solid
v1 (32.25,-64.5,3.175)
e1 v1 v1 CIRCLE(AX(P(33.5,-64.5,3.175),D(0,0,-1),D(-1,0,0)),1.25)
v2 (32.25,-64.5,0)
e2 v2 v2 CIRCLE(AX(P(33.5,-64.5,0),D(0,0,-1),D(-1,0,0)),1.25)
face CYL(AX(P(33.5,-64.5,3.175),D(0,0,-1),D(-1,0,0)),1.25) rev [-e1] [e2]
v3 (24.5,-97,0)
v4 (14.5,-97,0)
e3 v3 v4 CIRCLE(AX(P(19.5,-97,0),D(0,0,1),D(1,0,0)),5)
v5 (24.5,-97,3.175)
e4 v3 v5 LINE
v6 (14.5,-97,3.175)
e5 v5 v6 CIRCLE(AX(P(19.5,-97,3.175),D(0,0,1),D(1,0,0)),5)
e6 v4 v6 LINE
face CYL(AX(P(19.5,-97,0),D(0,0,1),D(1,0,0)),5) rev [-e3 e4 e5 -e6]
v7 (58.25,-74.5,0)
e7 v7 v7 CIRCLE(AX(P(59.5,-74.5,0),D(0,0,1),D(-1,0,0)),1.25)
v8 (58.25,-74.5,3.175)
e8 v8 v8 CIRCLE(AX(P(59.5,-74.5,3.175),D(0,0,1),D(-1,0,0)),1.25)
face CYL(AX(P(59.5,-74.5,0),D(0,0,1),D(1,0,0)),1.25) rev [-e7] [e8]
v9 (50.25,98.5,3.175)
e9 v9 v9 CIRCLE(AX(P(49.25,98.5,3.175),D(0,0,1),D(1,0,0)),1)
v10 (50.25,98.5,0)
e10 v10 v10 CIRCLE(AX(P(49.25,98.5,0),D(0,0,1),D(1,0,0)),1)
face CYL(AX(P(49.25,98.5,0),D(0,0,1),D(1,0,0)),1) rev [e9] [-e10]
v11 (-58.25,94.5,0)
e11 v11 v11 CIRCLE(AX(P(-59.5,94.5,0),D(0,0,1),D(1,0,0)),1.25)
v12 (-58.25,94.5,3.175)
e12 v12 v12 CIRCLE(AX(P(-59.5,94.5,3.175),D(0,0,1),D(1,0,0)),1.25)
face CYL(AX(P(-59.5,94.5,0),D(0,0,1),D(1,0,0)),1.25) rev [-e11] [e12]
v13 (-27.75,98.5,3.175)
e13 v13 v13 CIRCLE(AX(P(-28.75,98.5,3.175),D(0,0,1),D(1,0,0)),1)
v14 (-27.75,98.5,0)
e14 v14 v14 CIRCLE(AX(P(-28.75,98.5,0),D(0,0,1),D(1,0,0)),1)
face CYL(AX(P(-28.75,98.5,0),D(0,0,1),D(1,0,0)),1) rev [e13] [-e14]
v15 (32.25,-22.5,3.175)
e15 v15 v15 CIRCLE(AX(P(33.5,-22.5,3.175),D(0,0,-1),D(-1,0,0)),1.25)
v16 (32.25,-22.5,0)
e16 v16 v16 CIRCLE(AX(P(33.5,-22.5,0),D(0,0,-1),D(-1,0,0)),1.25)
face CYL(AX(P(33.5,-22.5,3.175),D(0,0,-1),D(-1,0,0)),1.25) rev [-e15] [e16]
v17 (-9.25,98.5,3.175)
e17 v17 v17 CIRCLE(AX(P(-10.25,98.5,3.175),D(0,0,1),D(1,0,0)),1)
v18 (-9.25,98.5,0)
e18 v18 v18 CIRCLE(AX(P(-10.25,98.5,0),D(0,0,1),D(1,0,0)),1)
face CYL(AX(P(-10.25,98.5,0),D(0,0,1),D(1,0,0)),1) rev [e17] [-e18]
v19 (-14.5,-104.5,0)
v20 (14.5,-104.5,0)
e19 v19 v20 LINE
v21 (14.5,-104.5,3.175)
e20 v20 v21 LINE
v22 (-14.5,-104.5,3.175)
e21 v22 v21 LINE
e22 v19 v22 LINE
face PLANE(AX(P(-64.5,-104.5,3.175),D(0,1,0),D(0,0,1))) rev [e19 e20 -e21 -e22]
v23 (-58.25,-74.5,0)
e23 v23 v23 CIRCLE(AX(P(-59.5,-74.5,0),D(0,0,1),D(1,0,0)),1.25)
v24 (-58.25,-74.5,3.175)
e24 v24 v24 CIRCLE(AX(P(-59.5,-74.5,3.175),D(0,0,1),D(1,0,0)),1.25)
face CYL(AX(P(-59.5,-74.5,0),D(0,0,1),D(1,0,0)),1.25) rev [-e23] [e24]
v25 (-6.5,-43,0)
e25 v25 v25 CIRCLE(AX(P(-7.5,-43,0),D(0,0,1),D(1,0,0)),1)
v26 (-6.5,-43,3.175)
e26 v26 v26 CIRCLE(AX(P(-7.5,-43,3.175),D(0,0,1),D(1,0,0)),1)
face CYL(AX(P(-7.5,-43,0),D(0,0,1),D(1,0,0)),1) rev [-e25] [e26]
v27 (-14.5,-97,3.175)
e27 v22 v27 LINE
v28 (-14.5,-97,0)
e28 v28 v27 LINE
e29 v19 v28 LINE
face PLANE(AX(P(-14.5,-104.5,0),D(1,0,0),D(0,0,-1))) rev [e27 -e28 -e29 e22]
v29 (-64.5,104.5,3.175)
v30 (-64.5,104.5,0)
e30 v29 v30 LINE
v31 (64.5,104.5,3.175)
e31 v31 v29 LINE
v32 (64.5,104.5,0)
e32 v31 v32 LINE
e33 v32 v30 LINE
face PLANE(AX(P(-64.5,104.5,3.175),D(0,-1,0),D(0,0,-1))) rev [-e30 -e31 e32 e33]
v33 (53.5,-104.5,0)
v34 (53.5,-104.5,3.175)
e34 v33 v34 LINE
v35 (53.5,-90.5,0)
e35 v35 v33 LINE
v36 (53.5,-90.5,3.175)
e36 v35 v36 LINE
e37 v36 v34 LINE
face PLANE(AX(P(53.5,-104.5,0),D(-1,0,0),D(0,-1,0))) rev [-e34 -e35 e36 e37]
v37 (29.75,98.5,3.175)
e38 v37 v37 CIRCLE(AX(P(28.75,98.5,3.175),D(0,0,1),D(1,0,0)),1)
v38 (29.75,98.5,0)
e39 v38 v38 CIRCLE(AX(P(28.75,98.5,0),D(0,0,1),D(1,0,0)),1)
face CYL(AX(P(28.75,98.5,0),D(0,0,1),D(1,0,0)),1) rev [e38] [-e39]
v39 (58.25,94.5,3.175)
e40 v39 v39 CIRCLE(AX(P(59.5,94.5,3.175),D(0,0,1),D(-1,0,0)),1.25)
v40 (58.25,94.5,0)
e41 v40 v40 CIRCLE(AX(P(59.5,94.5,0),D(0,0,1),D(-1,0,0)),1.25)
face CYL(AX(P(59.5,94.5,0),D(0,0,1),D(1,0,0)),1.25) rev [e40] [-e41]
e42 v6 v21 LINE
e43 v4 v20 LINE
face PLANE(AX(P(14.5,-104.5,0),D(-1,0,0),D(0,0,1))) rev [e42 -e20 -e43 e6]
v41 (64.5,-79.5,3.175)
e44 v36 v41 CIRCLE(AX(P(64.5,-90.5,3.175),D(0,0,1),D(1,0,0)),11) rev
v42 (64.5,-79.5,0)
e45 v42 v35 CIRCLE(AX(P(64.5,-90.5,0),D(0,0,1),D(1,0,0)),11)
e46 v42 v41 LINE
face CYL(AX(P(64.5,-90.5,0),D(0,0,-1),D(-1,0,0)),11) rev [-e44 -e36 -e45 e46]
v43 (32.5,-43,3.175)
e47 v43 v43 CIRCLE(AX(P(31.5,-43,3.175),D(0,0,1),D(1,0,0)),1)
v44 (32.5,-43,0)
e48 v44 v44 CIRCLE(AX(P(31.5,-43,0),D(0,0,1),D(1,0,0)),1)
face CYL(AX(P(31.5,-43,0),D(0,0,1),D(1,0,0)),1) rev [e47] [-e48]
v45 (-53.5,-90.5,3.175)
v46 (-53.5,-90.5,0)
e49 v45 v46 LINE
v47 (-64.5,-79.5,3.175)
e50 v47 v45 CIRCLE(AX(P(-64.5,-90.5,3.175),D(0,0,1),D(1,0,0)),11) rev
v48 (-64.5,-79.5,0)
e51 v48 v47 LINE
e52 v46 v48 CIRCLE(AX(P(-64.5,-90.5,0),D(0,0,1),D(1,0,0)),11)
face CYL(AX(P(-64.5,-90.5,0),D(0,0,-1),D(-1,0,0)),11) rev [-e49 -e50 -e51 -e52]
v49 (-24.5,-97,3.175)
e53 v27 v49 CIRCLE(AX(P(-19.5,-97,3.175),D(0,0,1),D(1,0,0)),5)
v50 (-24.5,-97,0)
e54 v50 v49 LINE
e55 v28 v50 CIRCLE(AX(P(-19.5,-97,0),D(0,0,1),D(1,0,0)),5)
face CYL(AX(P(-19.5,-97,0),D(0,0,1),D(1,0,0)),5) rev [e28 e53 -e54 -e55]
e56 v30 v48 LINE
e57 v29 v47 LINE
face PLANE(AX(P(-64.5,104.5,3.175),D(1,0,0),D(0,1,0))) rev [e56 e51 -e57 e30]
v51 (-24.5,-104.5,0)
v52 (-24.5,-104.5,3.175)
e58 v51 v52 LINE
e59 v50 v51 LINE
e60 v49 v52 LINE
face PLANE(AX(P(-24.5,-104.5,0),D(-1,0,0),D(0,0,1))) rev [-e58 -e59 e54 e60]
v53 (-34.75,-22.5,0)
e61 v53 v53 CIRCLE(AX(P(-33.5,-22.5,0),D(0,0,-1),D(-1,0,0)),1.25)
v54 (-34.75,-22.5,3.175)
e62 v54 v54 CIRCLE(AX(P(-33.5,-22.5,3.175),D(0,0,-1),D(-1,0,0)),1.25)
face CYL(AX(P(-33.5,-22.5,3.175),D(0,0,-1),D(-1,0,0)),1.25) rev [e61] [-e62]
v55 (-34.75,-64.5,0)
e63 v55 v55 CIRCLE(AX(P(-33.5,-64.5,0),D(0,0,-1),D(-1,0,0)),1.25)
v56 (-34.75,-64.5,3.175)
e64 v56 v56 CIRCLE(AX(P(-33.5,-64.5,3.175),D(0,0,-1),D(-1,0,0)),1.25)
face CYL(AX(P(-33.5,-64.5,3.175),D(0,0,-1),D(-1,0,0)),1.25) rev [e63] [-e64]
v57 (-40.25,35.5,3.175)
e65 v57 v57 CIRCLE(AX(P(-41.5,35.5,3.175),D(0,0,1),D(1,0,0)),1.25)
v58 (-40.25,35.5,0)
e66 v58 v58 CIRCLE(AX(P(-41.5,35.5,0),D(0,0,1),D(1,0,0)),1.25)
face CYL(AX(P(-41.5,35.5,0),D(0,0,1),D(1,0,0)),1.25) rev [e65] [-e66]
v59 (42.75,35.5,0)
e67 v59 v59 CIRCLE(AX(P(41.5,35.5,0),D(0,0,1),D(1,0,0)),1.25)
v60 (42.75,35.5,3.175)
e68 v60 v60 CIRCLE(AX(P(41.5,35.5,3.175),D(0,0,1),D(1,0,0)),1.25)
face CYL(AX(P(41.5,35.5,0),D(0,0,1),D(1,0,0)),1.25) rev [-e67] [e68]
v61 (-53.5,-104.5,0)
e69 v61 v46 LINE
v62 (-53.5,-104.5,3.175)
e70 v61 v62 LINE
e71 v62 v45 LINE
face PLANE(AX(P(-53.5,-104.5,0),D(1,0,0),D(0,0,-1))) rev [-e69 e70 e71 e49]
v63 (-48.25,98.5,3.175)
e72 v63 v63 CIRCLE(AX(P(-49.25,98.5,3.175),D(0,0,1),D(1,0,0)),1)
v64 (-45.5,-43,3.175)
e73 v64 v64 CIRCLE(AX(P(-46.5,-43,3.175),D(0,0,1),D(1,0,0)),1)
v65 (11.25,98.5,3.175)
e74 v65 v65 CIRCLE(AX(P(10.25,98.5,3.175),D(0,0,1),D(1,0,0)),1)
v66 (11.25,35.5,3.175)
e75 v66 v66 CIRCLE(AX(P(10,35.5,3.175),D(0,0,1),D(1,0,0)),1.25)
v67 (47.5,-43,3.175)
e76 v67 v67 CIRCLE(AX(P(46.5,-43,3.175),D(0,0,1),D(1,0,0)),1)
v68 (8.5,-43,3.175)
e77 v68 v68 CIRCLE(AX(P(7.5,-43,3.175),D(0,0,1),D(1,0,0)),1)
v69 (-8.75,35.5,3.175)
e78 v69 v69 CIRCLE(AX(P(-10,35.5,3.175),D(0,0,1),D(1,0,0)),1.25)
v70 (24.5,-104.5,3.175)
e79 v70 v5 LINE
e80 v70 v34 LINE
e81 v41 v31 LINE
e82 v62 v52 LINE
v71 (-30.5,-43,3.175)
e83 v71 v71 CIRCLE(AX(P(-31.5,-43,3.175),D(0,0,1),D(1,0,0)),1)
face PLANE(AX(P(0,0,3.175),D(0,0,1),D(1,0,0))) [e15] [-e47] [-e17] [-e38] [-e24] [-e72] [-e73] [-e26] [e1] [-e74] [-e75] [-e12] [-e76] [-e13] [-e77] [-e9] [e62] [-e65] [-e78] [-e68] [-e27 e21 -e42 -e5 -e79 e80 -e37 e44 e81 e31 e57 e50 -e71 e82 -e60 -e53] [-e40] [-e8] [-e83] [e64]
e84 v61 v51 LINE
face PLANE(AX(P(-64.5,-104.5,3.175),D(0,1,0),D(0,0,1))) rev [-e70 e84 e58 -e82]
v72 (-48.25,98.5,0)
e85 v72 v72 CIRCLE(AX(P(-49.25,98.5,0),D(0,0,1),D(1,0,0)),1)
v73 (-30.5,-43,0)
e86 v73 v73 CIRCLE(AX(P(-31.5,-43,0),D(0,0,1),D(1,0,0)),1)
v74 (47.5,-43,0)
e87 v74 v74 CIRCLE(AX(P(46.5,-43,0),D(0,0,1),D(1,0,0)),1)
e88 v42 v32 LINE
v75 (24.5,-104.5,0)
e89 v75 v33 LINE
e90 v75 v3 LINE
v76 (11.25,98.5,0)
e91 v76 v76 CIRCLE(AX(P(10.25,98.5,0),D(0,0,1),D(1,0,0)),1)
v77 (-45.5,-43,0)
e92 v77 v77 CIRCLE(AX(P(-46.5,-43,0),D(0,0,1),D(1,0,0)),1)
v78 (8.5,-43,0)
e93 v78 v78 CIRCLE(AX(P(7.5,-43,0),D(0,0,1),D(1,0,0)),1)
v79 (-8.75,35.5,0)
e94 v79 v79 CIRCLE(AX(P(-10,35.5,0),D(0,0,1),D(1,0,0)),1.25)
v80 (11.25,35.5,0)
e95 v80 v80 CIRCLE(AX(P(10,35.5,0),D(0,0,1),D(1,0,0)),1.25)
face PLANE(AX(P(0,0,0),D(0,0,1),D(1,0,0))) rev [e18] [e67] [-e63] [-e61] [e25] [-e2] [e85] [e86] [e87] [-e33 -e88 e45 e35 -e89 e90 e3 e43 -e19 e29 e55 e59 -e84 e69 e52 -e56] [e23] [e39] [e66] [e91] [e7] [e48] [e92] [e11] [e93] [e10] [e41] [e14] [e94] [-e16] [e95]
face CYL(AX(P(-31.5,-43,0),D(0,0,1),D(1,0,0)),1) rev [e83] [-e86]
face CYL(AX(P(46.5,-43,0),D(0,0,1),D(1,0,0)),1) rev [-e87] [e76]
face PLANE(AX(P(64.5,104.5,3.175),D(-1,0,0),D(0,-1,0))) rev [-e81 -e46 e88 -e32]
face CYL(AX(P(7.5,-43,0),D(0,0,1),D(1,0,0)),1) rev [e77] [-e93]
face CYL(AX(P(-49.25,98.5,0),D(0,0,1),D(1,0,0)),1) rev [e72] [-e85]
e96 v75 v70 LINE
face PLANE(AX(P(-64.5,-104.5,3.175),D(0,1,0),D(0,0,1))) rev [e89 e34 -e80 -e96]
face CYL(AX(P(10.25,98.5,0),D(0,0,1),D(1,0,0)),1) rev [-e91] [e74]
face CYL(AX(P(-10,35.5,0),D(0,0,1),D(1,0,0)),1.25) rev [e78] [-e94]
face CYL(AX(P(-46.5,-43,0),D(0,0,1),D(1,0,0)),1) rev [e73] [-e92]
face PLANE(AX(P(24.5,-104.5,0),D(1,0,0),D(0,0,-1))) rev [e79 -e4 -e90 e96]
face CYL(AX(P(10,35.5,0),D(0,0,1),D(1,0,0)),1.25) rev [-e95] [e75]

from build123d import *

# Parameters (mm, degrees)
SKETCH1_W           = 129
SKETCH1_H           = 209
BOSS_EXTRUDE1_DEPTH = 3.175
SKETCH2_R           = 1.25
SKETCH2_W           = 11
SKETCH2_H           = 25
CUT_EXTRUDE1_DEPTH  = 123.843724402
FILLET1_R           = 11
SKETCH3_R           = 1
CUT_EXTRUDE2_DEPTH  = 123.843724402
LPATTERN1_COUNT     = 2
LPATTERN1_PITCH     = 39
LPATTERN1_COL_COUNT = 2
LPATTERN1_COL_PITCH = 39
CUT_EXTRUDE3_DEPTH  = 123.843724402
SKETCH5_R           = 1.25
CUT_EXTRUDE4_DEPTH  = 123.843724402
SKETCH6_R           = 1.25
CUT_EXTRUDE5_DEPTH  = 123.843724402


with BuildPart() as part:
    # Sketch1 → Boss-Extrude1 (new body)
    with BuildSketch(Plane.XY):
        Rectangle(SKETCH1_W, SKETCH1_H)
    extrude(amount=BOSS_EXTRUDE1_DEPTH)

    # Sketch2 → Cut-Extrude1 (cut, through all)
    with BuildSketch(Plane.XY.offset(3.175)):
        with Locations((-59.5, 94.5)):
            Circle(SKETCH2_R)
        with Locations((-59.5, -74.5)):
            Circle(SKETCH2_R)
        with Locations(Location((59.5, -74.5, 0), (0, 0, 180))):
            Circle(SKETCH2_R)
        with Locations(Location((59.5, 94.5, 0), (0, 0, 180))):
            Circle(SKETCH2_R)
        with Locations((-59, -92)):
            Rectangle(SKETCH2_W, SKETCH2_H)
        with Locations((59, -92)):
            Rectangle(SKETCH2_W, SKETCH2_H)
    extrude(amount=-CUT_EXTRUDE1_DEPTH, mode=Mode.SUBTRACT)

    # Fillet1
    fillet1_edges = [part.edges().sort_by_distance(p)[0] for p in [
        (53.5, -79.5, 1.5875),
        (-53.5, -79.5, 1.5875),
    ]]
    fillet(fillet1_edges, radius=FILLET1_R - 0.0001)  # a hair under: the kernel refuses the full size

    # Sketch3 → Cut-Extrude2 (cut, through all)
    with BuildSketch(Plane.XY.offset(3.175)):
        with Locations((-10.25, 98.5)):
            Circle(SKETCH3_R)
        with Locations((10.25, 98.5)):
            Circle(SKETCH3_R)
        with Locations((-7.5, -43)):
            Circle(SKETCH3_R)
        with Locations((7.5, -43)):
            Circle(SKETCH3_R)
    cut_extrude2 = extrude(amount=-CUT_EXTRUDE2_DEPTH, mode=Mode.SUBTRACT)

    # LPattern1: Cut-Extrude2 ×2
    with Locations(*[(i * LPATTERN1_PITCH, 0, 0) for i in range(1, LPATTERN1_COUNT)]):
        add(cut_extrude2, mode=Mode.SUBTRACT)

    # LPattern1 col: Cut-Extrude2 ×2
    with Locations(*[(-i * LPATTERN1_COL_PITCH, 0, 0) for i in range(1, LPATTERN1_COL_COUNT)]):
        add(cut_extrude2, mode=Mode.SUBTRACT)

    # Sketch4 → Cut-Extrude3 (cut, through all)
    with BuildSketch(Plane.XY.offset(3.175)):
        with BuildLine():
            Line((-24.5, -104.5), (-24.5, -97))
            ThreePointArc((-24.5, -97), (-19.5, -92), (-14.5, -97))
            Line((-14.5, -97), (-14.5, -104.5))
            ThreePointArc((-14.5, -104.5), (-19.5, -109.5), (-24.5, -104.5))
        make_face()
        with BuildLine():
            Line((14.5, -104.5), (14.5, -97))
            ThreePointArc((14.5, -97), (19.5, -92), (24.5, -97))
            Line((24.5, -97), (24.5, -104.5))
            ThreePointArc((24.5, -104.5), (19.5, -109.5), (14.5, -104.5))
        make_face()
    extrude(amount=-CUT_EXTRUDE3_DEPTH, mode=Mode.SUBTRACT)

    # Sketch5 → Cut-Extrude4 (cut, through all)
    with BuildSketch(Plane.XY.offset(3.175)):
        with Locations((-10, 35.5)):
            Circle(SKETCH5_R)
        with Locations((-41.5, 35.5)):
            Circle(SKETCH5_R)
        with Locations((10, 35.5)):
            Circle(SKETCH5_R)
        with Locations((41.5, 35.5)):
            Circle(SKETCH5_R)
    extrude(amount=-CUT_EXTRUDE4_DEPTH, mode=Mode.SUBTRACT)

    # Sketch6 → Cut-Extrude5 (cut, through all)
    with BuildSketch(Plane(origin=(0, 0, 0), x_dir=(-1, 0, 0), z_dir=(0, 0, -1))):
        with Locations((-33.5, -22.5)):
            Circle(SKETCH6_R)
        with Locations((33.5, -22.5)):
            Circle(SKETCH6_R)
        with Locations((33.5, -64.5)):
            Circle(SKETCH6_R)
        with Locations((-33.5, -64.5)):
            Circle(SKETCH6_R)
    extrude(amount=-CUT_EXTRUDE5_DEPTH, mode=Mode.SUBTRACT)


solid = part.part
